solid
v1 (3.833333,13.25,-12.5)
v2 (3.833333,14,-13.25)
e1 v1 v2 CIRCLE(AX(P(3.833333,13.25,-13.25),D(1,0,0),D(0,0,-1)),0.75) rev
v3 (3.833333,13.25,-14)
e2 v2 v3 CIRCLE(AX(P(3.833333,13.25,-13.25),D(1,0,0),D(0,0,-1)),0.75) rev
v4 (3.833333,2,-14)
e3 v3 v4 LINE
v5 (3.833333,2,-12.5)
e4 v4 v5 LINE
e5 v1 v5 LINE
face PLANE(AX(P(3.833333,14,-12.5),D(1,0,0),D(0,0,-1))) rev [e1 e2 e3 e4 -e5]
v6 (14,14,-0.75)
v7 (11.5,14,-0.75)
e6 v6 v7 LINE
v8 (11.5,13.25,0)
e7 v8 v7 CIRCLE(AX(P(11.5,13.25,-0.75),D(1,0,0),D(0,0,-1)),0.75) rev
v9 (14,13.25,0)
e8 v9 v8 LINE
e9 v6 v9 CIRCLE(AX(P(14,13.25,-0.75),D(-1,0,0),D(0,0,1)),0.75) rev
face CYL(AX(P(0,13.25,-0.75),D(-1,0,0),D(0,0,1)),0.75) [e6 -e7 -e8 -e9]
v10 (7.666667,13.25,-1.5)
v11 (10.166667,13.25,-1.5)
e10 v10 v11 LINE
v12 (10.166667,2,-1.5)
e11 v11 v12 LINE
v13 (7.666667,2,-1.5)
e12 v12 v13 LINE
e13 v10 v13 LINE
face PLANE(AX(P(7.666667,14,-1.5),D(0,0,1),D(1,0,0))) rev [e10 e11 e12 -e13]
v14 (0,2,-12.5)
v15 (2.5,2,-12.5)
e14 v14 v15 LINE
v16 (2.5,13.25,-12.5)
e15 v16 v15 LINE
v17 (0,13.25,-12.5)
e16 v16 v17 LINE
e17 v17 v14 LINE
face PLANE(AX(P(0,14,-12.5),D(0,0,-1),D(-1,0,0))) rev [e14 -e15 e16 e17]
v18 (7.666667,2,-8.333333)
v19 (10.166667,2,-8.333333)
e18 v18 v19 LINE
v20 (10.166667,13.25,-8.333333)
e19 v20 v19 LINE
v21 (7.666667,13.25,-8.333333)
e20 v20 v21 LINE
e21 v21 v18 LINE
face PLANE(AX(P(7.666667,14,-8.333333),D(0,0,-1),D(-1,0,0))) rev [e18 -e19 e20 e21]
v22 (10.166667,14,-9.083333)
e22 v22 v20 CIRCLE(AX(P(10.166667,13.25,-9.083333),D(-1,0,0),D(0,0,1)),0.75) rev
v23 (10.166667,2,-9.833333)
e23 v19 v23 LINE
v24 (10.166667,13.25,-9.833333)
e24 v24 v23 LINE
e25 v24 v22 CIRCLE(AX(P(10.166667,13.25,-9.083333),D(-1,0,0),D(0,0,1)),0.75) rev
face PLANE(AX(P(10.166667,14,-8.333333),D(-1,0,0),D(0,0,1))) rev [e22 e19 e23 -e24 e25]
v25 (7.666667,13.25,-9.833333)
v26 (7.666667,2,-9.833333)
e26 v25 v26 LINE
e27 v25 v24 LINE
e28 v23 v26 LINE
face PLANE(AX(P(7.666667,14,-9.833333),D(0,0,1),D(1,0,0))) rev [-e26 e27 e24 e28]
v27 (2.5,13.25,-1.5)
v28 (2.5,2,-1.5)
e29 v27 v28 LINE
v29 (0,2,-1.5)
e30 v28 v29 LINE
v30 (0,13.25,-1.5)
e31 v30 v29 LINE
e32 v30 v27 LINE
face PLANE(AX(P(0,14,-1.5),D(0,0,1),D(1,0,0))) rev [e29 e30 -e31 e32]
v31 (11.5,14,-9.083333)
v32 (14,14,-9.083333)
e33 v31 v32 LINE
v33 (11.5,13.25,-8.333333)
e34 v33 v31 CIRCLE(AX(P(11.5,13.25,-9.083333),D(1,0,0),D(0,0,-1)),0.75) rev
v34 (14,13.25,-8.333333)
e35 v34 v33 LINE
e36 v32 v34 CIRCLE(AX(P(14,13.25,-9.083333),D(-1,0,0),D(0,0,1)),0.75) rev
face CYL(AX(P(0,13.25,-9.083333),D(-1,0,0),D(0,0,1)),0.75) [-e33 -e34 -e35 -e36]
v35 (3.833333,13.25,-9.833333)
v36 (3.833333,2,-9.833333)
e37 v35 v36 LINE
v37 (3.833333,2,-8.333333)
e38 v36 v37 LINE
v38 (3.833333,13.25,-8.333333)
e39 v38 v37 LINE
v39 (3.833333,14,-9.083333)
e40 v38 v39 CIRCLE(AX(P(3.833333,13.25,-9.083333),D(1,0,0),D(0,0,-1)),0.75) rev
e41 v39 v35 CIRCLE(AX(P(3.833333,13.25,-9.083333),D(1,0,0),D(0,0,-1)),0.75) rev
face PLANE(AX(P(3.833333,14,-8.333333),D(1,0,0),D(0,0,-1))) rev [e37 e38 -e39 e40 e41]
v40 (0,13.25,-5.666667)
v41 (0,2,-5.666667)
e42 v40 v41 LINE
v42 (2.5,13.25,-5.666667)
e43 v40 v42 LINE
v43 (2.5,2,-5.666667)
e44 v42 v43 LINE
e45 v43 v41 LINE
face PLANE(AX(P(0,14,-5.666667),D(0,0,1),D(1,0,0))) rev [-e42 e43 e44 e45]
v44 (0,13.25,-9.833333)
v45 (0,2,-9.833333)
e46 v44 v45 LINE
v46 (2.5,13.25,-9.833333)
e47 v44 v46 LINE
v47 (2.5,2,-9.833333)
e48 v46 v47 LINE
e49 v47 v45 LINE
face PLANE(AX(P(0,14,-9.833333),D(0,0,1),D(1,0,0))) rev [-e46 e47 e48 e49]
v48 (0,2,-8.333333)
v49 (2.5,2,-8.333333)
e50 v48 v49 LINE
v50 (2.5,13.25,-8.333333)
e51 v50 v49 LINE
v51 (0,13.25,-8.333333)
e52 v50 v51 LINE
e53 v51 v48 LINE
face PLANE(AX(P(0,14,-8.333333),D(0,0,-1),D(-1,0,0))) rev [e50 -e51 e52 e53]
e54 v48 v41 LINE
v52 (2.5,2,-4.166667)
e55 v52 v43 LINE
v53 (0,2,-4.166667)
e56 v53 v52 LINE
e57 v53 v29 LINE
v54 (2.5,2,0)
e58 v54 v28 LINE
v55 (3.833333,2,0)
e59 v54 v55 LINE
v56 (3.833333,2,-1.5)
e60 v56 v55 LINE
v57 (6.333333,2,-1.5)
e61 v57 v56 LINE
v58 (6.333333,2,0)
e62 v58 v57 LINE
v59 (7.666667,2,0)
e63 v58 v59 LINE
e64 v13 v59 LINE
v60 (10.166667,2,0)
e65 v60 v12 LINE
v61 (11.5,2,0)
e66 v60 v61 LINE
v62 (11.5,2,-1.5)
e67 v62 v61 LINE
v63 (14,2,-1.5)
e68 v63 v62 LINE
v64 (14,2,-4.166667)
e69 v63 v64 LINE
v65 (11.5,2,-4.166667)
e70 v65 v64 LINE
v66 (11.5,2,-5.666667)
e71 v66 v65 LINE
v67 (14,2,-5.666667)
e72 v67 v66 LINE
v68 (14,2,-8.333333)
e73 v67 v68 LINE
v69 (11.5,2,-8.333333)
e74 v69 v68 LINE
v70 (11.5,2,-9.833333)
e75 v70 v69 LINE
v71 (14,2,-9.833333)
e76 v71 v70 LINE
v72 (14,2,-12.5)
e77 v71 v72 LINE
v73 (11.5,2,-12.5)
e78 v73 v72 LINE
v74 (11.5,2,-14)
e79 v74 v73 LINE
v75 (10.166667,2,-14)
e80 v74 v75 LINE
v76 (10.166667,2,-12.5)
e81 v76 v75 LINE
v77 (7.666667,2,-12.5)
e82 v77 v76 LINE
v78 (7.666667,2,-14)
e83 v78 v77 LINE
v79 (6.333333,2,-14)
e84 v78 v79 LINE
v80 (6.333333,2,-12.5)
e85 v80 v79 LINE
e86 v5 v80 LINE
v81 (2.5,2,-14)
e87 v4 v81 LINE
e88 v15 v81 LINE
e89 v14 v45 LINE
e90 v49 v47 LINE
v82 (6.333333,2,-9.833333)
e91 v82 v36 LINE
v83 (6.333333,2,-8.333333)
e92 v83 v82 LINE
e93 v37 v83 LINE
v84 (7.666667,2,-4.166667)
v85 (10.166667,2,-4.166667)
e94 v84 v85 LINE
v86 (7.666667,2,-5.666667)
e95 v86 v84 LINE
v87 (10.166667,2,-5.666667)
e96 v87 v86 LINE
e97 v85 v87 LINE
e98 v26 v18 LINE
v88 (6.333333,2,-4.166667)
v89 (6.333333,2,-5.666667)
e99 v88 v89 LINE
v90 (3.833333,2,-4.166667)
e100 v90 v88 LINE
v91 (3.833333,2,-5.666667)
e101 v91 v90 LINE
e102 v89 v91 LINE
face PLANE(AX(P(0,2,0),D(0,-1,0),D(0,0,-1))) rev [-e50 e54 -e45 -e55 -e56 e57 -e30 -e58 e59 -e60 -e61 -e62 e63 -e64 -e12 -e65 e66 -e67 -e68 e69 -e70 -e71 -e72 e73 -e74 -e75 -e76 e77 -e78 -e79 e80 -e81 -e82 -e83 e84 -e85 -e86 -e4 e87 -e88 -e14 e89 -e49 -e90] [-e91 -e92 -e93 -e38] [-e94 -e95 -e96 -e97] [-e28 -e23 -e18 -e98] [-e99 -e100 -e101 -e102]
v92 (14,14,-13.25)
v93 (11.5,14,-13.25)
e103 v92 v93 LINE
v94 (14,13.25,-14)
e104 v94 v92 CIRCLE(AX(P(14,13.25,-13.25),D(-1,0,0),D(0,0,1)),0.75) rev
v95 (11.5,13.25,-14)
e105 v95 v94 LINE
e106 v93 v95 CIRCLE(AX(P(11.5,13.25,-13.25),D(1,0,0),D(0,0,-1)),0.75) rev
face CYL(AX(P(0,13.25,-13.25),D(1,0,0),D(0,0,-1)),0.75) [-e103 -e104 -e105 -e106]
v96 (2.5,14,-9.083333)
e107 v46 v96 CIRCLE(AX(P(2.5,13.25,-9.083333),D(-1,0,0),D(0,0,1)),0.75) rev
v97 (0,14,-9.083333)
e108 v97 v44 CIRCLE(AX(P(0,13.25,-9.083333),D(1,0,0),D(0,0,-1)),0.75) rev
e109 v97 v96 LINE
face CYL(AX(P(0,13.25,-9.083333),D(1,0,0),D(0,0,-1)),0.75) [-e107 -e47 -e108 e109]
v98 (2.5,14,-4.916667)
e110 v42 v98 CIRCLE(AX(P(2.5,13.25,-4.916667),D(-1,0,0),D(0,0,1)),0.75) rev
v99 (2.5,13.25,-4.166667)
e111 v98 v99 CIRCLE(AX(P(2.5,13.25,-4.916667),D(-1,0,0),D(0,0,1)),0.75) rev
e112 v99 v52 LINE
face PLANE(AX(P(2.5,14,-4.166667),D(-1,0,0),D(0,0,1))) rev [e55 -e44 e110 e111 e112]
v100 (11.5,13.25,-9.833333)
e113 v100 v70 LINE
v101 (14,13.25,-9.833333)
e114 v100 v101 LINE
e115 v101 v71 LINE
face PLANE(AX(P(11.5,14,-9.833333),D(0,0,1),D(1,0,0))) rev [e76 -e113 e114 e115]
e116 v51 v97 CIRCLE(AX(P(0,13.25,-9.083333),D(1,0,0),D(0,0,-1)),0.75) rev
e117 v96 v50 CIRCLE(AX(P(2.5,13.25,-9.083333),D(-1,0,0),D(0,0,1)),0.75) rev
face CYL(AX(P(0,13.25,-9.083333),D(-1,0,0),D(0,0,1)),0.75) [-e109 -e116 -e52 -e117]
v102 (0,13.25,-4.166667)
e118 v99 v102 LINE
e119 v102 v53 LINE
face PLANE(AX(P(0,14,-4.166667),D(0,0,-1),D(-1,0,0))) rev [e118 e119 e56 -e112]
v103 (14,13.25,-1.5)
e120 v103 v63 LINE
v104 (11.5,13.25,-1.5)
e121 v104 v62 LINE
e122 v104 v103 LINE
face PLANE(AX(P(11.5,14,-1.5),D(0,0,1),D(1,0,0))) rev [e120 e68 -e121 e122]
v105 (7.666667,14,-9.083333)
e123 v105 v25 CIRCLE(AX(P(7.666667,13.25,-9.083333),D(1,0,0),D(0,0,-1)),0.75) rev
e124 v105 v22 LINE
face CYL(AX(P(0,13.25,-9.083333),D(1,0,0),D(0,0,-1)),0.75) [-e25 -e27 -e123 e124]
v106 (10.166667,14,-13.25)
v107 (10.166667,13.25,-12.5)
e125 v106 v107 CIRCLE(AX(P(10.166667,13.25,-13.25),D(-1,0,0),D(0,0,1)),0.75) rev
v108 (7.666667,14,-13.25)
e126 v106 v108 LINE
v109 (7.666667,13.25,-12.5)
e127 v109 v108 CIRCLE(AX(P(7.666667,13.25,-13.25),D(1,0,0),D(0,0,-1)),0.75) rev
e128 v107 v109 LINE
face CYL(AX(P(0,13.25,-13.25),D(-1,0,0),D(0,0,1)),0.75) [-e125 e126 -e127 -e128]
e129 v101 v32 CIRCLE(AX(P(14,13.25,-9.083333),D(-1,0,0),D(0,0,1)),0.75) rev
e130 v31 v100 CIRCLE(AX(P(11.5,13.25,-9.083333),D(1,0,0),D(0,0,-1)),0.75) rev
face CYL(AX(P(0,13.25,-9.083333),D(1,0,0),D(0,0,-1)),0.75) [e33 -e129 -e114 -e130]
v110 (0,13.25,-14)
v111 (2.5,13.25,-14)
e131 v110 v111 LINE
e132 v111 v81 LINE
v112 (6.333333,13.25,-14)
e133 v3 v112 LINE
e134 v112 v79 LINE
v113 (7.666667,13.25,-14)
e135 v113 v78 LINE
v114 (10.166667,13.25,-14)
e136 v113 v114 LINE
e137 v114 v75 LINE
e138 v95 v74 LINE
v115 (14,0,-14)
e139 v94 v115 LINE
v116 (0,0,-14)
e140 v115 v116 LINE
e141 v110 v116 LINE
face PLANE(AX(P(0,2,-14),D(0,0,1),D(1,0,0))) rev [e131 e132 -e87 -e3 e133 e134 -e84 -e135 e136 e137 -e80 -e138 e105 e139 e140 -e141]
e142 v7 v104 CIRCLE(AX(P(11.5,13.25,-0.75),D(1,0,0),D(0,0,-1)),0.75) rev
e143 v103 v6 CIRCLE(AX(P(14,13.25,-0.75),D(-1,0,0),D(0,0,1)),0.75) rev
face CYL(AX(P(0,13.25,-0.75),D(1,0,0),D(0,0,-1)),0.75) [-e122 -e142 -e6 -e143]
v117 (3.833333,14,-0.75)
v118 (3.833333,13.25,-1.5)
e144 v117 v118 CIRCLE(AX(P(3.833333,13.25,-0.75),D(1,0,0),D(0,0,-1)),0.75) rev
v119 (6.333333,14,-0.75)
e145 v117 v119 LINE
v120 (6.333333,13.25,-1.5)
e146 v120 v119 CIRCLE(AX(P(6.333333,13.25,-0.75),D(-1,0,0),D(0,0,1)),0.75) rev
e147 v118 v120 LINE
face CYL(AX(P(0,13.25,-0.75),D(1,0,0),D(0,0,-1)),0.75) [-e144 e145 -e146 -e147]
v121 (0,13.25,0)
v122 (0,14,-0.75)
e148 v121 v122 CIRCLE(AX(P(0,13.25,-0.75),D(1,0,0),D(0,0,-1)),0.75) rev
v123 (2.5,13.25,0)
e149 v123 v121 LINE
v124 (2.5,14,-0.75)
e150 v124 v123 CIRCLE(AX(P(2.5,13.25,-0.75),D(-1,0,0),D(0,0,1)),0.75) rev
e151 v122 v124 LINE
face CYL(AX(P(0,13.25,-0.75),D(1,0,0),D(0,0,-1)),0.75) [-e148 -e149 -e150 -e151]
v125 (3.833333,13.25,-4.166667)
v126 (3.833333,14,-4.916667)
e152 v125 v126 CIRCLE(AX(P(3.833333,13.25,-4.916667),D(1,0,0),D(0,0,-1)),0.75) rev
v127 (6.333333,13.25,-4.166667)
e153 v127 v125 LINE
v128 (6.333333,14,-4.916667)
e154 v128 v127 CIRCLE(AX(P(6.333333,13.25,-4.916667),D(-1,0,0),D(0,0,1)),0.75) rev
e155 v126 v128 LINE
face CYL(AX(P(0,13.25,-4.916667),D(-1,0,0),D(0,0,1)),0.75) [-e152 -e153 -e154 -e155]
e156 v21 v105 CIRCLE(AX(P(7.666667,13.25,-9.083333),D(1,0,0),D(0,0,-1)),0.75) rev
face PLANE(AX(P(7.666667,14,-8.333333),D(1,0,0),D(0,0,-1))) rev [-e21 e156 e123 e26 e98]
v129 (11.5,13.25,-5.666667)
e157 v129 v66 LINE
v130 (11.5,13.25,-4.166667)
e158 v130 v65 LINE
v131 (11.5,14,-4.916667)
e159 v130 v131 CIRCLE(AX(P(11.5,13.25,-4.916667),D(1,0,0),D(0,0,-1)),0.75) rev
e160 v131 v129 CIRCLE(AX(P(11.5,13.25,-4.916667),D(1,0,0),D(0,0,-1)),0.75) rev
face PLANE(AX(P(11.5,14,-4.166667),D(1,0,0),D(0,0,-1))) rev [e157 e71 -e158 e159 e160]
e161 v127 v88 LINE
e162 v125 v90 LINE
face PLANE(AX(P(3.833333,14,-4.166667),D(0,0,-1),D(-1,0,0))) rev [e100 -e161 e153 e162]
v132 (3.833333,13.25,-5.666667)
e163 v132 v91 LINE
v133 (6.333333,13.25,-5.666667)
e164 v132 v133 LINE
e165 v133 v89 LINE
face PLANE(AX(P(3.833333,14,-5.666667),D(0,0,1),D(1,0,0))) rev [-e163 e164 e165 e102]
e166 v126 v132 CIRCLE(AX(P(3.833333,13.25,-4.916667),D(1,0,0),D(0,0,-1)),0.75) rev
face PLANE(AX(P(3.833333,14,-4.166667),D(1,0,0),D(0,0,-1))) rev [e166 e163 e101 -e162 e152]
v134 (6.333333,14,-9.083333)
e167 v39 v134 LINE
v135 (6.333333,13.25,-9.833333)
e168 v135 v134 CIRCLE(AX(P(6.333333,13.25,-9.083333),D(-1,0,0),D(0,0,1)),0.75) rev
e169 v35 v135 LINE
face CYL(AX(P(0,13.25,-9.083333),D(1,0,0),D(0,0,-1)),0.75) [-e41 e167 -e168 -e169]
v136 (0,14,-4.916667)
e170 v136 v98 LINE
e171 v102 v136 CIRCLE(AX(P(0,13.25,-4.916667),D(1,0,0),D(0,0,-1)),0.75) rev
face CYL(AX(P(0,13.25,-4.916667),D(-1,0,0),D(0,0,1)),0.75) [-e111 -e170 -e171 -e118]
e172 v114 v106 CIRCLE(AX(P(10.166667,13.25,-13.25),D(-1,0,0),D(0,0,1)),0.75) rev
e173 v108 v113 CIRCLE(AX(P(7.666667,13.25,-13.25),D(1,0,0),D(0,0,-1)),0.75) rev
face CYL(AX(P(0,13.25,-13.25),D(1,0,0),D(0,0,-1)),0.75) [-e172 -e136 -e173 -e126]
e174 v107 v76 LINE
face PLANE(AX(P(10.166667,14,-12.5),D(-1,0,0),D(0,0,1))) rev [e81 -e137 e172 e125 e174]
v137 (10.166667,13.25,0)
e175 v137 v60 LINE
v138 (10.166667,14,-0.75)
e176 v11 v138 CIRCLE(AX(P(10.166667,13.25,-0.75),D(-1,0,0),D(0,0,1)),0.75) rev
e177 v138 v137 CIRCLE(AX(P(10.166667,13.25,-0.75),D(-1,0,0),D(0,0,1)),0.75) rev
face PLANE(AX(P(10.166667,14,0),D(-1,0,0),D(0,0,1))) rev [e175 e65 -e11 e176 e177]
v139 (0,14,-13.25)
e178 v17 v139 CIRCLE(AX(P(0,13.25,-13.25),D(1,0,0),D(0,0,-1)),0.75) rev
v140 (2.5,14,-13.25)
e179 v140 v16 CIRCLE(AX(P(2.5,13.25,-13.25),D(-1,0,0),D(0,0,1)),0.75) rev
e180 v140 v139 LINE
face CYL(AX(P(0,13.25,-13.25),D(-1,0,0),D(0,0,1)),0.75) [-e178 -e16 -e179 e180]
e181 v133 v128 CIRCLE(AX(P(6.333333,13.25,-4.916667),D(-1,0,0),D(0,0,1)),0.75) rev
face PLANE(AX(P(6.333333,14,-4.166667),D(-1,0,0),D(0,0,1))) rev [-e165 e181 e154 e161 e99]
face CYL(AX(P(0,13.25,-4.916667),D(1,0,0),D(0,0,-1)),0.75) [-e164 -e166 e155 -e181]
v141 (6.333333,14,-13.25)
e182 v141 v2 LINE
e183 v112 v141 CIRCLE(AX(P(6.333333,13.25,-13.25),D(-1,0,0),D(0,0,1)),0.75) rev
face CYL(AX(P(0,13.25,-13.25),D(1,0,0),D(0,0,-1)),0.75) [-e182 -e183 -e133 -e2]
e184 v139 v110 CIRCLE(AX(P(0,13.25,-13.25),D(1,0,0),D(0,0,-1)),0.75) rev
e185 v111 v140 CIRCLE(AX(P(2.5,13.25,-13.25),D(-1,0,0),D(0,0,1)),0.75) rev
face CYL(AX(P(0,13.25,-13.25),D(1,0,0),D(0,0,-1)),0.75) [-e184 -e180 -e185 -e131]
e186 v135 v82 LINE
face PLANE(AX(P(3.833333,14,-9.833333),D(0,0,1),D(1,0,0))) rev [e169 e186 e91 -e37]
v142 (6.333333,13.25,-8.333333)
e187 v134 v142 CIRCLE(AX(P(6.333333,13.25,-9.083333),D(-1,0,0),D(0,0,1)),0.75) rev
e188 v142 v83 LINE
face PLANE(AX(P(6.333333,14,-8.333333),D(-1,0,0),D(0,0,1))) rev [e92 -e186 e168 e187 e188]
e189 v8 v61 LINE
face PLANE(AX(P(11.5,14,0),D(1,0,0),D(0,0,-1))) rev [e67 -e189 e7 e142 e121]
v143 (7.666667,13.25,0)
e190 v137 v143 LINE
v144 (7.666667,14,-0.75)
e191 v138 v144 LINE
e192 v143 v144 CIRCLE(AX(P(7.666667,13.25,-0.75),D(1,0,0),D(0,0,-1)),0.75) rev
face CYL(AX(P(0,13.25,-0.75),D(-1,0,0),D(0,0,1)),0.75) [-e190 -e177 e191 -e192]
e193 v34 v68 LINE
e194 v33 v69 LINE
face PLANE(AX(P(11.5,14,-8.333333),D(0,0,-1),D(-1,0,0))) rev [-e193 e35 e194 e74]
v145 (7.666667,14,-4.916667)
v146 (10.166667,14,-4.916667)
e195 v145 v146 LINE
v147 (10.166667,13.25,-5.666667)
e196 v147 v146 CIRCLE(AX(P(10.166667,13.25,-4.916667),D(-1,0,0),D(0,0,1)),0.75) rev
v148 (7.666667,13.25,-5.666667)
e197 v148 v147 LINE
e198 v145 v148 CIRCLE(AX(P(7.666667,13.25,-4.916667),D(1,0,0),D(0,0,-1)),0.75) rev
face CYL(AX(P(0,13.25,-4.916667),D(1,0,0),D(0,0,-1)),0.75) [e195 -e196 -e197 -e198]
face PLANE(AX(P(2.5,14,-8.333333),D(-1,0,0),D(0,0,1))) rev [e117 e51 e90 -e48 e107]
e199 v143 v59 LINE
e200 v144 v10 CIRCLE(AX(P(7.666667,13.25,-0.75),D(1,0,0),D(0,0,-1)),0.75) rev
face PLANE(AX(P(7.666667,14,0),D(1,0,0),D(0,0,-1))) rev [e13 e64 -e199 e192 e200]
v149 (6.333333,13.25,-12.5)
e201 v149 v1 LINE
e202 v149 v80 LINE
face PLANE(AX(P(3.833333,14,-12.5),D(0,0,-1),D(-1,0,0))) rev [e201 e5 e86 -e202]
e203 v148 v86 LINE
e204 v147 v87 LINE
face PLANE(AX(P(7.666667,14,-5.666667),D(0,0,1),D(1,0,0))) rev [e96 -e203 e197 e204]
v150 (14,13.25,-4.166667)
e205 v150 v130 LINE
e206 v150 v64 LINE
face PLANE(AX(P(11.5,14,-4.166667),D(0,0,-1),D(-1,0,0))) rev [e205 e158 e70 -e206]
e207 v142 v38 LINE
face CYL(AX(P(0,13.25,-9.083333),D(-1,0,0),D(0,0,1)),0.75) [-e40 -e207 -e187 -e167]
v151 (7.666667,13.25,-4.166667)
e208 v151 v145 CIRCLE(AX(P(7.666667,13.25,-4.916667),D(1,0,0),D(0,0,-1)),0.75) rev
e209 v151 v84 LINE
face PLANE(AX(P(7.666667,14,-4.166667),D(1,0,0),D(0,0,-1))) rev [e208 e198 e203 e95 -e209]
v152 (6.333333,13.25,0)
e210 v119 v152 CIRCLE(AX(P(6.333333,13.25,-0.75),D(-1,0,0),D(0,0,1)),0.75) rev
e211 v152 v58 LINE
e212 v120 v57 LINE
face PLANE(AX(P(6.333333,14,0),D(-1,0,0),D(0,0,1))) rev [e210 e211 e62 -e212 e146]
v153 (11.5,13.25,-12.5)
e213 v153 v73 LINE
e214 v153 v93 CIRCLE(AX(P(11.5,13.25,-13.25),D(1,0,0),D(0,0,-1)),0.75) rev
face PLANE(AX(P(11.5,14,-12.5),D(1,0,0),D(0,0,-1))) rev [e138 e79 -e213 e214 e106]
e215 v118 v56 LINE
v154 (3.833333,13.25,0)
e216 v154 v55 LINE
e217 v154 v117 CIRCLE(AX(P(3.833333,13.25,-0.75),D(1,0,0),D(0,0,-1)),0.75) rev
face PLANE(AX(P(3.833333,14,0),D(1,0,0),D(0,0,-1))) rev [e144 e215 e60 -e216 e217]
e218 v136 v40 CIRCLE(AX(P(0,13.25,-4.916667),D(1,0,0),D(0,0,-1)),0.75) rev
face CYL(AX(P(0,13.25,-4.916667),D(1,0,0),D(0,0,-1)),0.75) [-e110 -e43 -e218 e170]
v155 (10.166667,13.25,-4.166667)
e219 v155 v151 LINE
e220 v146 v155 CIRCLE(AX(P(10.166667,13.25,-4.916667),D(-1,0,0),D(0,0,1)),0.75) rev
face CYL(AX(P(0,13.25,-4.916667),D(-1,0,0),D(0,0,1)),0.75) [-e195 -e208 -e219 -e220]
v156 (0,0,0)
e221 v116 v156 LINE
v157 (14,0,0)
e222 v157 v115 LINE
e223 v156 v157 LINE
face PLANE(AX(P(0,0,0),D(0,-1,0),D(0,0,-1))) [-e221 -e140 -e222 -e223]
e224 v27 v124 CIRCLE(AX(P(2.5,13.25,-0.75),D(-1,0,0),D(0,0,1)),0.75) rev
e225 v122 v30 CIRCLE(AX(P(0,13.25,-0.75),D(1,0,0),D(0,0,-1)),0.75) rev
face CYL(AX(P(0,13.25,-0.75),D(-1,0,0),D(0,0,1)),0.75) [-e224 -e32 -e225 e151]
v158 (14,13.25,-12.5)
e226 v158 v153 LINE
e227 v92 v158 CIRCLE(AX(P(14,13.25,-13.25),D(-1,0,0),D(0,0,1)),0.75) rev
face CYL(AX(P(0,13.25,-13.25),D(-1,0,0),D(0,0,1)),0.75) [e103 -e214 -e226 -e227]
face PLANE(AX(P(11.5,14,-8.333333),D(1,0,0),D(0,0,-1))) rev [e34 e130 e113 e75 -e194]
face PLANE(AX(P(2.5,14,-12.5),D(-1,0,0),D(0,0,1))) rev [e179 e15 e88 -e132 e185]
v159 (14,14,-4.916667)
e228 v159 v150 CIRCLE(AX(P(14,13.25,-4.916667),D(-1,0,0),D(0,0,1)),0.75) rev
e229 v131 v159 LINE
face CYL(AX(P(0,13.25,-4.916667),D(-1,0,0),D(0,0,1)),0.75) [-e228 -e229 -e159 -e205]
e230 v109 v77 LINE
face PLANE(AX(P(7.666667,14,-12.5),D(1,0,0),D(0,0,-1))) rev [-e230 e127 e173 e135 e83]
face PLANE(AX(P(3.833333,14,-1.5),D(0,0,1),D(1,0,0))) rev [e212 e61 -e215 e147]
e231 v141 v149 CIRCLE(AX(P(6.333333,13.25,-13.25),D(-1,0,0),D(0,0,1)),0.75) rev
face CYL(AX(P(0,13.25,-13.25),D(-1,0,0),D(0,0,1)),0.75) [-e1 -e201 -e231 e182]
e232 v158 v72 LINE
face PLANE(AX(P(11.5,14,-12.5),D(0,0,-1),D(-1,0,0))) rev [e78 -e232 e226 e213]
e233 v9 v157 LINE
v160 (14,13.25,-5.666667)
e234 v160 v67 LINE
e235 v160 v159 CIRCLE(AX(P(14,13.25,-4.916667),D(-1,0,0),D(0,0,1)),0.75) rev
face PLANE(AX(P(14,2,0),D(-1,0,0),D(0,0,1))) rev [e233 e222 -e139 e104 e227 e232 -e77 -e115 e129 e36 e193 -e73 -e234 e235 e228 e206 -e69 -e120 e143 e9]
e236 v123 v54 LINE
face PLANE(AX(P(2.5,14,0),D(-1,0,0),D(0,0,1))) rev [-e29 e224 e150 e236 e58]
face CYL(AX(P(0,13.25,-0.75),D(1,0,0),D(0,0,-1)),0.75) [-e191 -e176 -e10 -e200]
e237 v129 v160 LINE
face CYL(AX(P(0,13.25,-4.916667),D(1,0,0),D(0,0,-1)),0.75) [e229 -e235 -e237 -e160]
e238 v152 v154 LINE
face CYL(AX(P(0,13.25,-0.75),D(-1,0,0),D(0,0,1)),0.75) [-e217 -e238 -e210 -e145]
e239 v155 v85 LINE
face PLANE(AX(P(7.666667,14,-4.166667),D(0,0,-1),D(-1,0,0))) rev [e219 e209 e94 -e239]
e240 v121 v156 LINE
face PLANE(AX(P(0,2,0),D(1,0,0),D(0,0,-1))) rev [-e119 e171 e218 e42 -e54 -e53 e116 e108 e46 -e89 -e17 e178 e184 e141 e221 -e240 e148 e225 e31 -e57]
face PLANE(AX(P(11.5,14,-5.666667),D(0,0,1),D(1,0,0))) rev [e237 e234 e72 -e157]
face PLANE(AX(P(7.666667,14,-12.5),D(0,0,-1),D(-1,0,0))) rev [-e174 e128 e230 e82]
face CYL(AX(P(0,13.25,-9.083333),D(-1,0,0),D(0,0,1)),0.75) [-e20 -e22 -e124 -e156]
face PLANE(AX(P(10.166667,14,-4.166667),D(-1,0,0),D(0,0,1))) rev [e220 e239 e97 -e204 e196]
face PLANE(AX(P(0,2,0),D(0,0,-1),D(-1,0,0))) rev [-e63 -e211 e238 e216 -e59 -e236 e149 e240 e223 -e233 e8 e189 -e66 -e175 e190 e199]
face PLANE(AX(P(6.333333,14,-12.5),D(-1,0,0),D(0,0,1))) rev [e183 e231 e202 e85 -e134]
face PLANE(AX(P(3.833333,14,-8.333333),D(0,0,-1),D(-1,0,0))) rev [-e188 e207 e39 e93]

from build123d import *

# Parameters (mm, degrees)
SKETCH1_W           = 14
SKETCH1_H           = 14
BOSS_EXTRUDE1_DEPTH = 2
SKETCH2_W           = 2.5
SKETCH2_H           = 1.5
BOSS_EXTRUDE2_DEPTH = 12
FILLET1_R           = 0.75


with BuildPart() as part:
    # Sketch1 → Boss-Extrude1 (new body)
    with BuildSketch(Plane(origin=(0, 0, 0), x_dir=(1, 0, 0), z_dir=(0, 1, 0))):
        with Locations((7, 7)):
            Rectangle(SKETCH1_W, SKETCH1_H)
    extrude(amount=BOSS_EXTRUDE1_DEPTH)

    # Sketch2 → Boss-Extrude2 (add)
    with BuildSketch(Plane(origin=(0, 2, 0), x_dir=(1, 0, 0), z_dir=(0, 1, 0))):
        with Locations((5.083333333, 0.75)):
            Rectangle(SKETCH2_W, SKETCH2_H)
        with Locations((1.25, 0.75)):
            Rectangle(SKETCH2_W, SKETCH2_H)
        with Locations((8.916666667, 0.75)):
            Rectangle(SKETCH2_W, SKETCH2_H)
        with Locations((12.75, 0.75)):
            Rectangle(SKETCH2_W, SKETCH2_H)
        with Locations((5.083333333, 4.916666667)):
            Rectangle(SKETCH2_W, SKETCH2_H)
        with Locations((8.916666667, 4.916666667)):
            Rectangle(SKETCH2_W, SKETCH2_H)
        with Locations((12.75, 4.916666667)):
            Rectangle(SKETCH2_W, SKETCH2_H)
        with Locations((5.083333333, 9.083333333)):
            Rectangle(SKETCH2_W, SKETCH2_H)
        with Locations((8.916666667, 9.083333333)):
            Rectangle(SKETCH2_W, SKETCH2_H)
        with Locations((12.75, 9.083333333)):
            Rectangle(SKETCH2_W, SKETCH2_H)
        with Locations((5.083333333, 13.25)):
            Rectangle(SKETCH2_W, SKETCH2_H)
        with Locations((8.916666667, 13.25)):
            Rectangle(SKETCH2_W, SKETCH2_H)
        with Locations((12.75, 13.25)):
            Rectangle(SKETCH2_W, SKETCH2_H)
        with Locations((1.25, 4.916666667)):
            Rectangle(SKETCH2_W, SKETCH2_H)
        with Locations((1.25, 9.083333333)):
            Rectangle(SKETCH2_W, SKETCH2_H)
        with Locations((1.25, 13.25)):
            Rectangle(SKETCH2_W, SKETCH2_H)
    extrude(amount=BOSS_EXTRUDE2_DEPTH)

    # Fillet1
    fillet1_edges = [part.edges().sort_by_distance(p)[0] for p in [
        (12.75, 14, -12.5),
        (8.916666667, 14, -12.5),
        (5.083333333, 14, -12.5),
        (1.25, 14, -12.5),
        (1.25, 14, -14),
        (5.083333333, 14, -14),
        (8.916666667, 14, -14),
        (12.75, 14, -14),
        (12.75, 14, -9.833333333),
        (8.916666667, 14, -9.833333333),
        (5.083333333, 14, -9.833333333),
        (1.25, 14, -9.833333333),
        (1.25, 14, -8.333333333),
        (5.083333333, 14, -8.333333333),
        (8.916666667, 14, -8.333333333),
        (12.75, 14, -8.333333333),
        (8.916666667, 14, -5.666666667),
        (12.75, 14, -5.666666667),
        (5.083333333, 14, -5.666666667),
        (1.25, 14, -5.666666667),
        (1.25, 14, -4.166666667),
        (5.083333333, 14, -4.166666667),
        (8.916666667, 14, -4.166666667),
        (12.75, 14, -4.166666667),
        (8.916666667, 14, 0),
        (12.75, 14, 0),
        (12.75, 14, -1.5),
        (8.916666667, 14, -1.5),
        (5.083333333, 14, -1.5),
        (5.083333333, 14, 0),
        (1.25, 14, -1.5),
        (1.25, 14, 0),
    ]]
    fillet(fillet1_edges, radius=FILLET1_R - 0.0001)  # a hair under: the kernel refuses the full size


solid = part.part
